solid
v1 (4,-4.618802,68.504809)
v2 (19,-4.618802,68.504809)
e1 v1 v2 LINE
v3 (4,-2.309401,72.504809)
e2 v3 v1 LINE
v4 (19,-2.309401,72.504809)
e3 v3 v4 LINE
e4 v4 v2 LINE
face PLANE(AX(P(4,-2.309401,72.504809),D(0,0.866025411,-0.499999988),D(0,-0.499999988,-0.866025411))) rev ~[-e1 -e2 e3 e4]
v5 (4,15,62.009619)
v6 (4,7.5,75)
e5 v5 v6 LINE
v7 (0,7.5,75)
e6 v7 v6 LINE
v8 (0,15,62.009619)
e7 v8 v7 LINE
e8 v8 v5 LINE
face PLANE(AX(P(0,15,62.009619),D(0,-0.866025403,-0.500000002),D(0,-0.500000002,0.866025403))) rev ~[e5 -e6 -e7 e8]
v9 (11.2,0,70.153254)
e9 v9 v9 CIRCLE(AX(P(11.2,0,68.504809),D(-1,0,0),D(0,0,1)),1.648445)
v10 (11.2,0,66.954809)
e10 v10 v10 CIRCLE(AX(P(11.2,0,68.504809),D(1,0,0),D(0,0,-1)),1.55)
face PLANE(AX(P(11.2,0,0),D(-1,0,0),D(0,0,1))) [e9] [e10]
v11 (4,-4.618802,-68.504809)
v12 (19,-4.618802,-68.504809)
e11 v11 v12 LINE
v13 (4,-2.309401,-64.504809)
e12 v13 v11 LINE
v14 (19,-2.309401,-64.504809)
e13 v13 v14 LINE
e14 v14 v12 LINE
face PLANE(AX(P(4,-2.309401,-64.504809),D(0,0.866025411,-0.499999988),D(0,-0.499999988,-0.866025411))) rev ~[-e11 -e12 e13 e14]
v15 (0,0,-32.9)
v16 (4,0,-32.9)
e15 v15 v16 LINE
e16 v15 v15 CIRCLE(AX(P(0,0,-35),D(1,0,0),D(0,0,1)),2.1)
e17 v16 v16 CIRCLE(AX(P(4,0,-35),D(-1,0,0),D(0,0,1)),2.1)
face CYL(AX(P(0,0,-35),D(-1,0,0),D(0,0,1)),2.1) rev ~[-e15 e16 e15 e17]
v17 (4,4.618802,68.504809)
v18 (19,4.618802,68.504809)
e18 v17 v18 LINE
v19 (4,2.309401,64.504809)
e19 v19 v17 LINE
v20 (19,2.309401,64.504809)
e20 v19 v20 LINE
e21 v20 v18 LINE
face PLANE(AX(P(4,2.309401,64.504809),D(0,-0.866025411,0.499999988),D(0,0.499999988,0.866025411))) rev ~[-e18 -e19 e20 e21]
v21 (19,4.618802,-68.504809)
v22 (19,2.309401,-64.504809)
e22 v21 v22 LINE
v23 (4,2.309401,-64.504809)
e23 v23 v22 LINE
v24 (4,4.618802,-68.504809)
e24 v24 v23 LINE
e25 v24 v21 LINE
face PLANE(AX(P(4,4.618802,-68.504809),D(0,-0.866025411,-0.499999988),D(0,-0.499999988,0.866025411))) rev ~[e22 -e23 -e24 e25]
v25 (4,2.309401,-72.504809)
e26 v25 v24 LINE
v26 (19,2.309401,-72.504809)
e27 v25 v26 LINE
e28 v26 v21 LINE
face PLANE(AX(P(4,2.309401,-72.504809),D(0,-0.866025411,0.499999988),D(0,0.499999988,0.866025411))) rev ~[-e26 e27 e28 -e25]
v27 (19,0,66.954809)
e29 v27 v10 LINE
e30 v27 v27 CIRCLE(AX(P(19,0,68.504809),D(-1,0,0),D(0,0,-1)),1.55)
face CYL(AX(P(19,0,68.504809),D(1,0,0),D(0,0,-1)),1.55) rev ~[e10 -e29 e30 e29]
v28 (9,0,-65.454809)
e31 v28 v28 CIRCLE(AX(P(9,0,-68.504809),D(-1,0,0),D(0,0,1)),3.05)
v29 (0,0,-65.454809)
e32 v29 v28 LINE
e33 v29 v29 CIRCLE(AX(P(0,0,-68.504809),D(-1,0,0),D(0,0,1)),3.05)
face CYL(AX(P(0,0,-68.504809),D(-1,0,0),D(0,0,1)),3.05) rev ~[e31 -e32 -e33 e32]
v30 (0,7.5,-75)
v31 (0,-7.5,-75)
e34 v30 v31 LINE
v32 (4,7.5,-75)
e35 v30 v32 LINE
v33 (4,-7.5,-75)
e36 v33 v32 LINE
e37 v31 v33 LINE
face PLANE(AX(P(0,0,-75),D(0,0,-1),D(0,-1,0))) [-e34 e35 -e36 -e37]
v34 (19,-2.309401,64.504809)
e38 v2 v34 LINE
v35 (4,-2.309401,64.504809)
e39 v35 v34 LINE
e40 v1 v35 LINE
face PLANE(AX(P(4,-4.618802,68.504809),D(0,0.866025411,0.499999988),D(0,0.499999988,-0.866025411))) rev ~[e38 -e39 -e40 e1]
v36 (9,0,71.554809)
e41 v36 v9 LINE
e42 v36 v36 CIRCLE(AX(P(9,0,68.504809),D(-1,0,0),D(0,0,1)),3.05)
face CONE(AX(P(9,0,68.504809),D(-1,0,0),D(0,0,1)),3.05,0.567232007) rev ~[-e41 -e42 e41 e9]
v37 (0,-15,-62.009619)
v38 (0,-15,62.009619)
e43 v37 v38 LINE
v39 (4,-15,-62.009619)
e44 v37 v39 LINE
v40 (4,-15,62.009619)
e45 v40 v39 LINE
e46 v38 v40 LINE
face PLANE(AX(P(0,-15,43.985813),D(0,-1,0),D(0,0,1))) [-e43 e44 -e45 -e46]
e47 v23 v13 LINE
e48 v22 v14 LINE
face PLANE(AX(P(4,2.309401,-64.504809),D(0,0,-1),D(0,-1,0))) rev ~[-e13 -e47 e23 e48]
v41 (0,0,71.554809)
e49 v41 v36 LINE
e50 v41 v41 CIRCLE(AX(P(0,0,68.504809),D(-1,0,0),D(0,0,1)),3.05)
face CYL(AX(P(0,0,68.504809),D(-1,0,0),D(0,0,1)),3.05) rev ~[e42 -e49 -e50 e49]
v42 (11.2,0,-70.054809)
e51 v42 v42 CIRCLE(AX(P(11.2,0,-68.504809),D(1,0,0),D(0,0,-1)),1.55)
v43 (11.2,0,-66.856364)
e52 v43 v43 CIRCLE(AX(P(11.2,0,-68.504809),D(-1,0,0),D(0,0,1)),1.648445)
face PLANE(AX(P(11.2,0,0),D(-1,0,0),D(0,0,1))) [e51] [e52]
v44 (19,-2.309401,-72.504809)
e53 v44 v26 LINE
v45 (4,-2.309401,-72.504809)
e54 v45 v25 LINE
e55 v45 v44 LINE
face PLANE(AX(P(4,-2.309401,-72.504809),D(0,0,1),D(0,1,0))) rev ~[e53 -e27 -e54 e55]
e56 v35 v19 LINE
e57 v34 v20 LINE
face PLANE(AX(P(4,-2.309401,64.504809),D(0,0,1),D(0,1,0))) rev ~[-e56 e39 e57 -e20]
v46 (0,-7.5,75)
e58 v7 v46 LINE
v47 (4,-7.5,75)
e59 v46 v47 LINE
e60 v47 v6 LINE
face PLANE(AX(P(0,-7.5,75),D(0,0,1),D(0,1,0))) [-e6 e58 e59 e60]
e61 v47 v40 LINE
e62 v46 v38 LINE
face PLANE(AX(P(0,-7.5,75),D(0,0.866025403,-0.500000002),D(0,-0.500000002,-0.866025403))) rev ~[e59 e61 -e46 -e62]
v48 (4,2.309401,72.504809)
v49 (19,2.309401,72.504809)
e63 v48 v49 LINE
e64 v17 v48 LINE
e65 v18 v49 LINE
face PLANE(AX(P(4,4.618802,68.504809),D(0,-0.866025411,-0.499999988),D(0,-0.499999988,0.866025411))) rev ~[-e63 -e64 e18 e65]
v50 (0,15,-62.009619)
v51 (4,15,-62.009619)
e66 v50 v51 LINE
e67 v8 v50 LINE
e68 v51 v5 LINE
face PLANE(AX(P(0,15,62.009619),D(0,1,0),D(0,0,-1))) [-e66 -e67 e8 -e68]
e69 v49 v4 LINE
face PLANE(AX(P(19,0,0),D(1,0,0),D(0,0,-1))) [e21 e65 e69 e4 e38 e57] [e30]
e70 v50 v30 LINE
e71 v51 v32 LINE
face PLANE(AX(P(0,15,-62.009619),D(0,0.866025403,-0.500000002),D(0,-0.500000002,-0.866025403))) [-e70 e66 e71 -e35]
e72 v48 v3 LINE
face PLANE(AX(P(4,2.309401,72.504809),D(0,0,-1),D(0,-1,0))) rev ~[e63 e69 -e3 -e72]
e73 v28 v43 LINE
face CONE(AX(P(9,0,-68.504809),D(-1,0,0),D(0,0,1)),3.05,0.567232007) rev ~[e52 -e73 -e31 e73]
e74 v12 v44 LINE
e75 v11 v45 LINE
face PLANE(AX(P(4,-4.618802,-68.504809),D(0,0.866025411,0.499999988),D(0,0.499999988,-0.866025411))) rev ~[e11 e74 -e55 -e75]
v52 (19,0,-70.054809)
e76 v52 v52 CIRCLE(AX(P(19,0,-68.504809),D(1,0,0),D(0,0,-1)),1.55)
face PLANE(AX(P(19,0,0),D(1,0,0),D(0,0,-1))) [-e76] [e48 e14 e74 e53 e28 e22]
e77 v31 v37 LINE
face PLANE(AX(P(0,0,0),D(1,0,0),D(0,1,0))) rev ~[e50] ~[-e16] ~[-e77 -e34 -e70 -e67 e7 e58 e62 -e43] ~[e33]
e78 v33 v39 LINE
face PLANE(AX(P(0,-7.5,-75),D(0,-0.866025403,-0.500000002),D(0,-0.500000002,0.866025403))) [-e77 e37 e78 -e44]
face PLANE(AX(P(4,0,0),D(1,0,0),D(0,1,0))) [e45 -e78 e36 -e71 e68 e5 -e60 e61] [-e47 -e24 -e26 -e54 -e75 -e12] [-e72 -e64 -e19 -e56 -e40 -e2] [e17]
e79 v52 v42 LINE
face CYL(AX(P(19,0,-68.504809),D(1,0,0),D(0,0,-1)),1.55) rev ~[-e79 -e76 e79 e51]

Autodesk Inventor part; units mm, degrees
ref_plane "YZ Plane" through (0, 0, 0) normal (1, 0, 0) x (0, 1, 0)
ref_plane "XZ Plane" through (0, 0, 0) normal (0, 1, 0) x (-1, 0, 0)
sketch "Sketch1" plane through (0, 0, 0) normal (1, 0, 0) x (0, 1, 0)
  line L0 (-15, 75) -> (15, 75)
  line L1 (15, 75) -> (15, -75)
  line L2 (15, -75) -> (-15, -75)
  line L3 (-15, -75) -> (-15, 75)
  line L4 (-15, 75) -> (15, -75) construction
  line L5 (15, 75) -> (-15, -75) construction
  line L6 (15, 64.89637) -> (15, 43.985813)
  line L7 (-15, 43.985813) -> (-15, 64.193072)
  line L8 (-21, 0) -> (21, 0)
  line L9 (0, -105) -> (0, 105)
  line L10 (-15, -62.009619) -> (-7.5, -49.019238)
  line L11 (-7.5, -49.019238) -> (7.5, -49.019238)
  line L12 (7.5, -49.019238) -> (15, -62.009619)
  line L13 (15, -62.009619) -> (7.5, -75)
  line L14 (7.5, -75) -> (-7.5, -75)
  line L15 (-7.5, -75) -> (-15, -62.009619)
  line L16 (15, 62.009619) -> (7.5, 75)
  line L17 (-7.5, 75) -> (-15, 62.009619)
  point P0 (0, 0)
  point P1 (0, -62.009619)
  point P2 (-7.5, -75)
  point P3 (7.5, -75)
  point P4 (15, -62.009619)
  point P5 (15, 62.009619)
  point P6 (7.5, 75)
  point P7 (-7.5, 75)
  point P8 (-15, 62.009619)
  dimension "d0" = 30
  dimension "d1" = 150
extrude "Extrusion1" add sketch "Sketch1" along normal blind 4 contours L0 L9 L8 L3 L17 | L0 L16 L1 L8 L9 | L9 L11 L10 L3 L8 | L8 L1 L12 L11 L9 | L11 L12 L13 L2 L9 | L9 L2 L15 L10 L11
sketch "Sketch2" plane through (4, 0, 0) normal (1, 0, 0) x (0, 0, -1)
  line L0 (62.009619, 15) -> (-62.009619, 15)
  line L1 (62.009619, 15) -> (-62.009619, 15)
  line L2 (-62.009619, -15) -> (62.009619, -15)
  line L3 (-105, 0) -> (105, 0)
  line L4 (0, -21) -> (0, 21)
  line L5 (-68.504809, 4.618802) -> (-64.504809, 2.309401)
  line L6 (-64.504809, 2.309401) -> (-64.504809, -2.309401)
  line L7 (-64.504809, -2.309401) -> (-68.504809, -4.618802)
  line L8 (-68.504809, -4.618802) -> (-72.504809, -2.309401)
  line L9 (-72.504809, -2.309401) -> (-72.504809, 2.309401)
  line L10 (-72.504809, 2.309401) -> (-68.504809, 4.618802)
  line L11 (68.504809, 4.618802) -> (64.504809, 2.309401)
  line L12 (64.504809, 2.309401) -> (64.504809, -2.309401)
  line L13 (64.504809, -2.309401) -> (68.504809, -4.618802)
  line L14 (68.504809, -4.618802) -> (72.504809, -2.309401)
  line L15 (72.504809, -2.309401) -> (72.504809, 2.309401)
  line L16 (72.504809, 2.309401) -> (68.504809, 4.618802)
  line L17 (-75, 7.5) -> (-75, -7.5)
  line L18 (-62.009619, -15) -> (62.009619, -15)
  line L19 (-62.009619, 15) -> (-62.009619, -15)
  line L20 (-75, 7.5) -> (-75, -7.5)
  line L21 (-75, 0) -> (-62.009619, 0)
  point P0 (0, 0)
  point P1 (68.504809, 0)
  point P2 (-68.504809, 0)
  dimension "d8" = 8
sketch "Sketch2 outline for Extrusion3" plane through (4, 0, 0) normal (1, 0, 0) x (0, 0, -1)
  line L0 (68.504809, -4.618802) -> (72.504809, -2.309401)
  line L1 (64.504809, -2.309401) -> (68.504809, -4.618802)
  line L2 (64.504809, 2.309401) -> (64.504809, -2.309401)
  line L3 (68.504809, 4.618802) -> (64.504809, 2.309401)
  line L4 (72.504809, 2.309401) -> (68.504809, 4.618802)
  line L5 (72.504809, -2.309401) -> (72.504809, 2.309401)
  line L6 (-64.504809, 2.309401) -> (-68.504809, 4.618802)
  line L7 (-64.504809, -2.309401) -> (-64.504809, 2.309401)
  line L8 (-68.504809, -4.618802) -> (-64.504809, -2.309401)
  line L9 (-72.504809, -2.309401) -> (-68.504809, -4.618802)
  line L10 (-72.504809, 2.309401) -> (-72.504809, -2.309401)
  line L11 (-68.504809, 4.618802) -> (-72.504809, 2.309401)
extrude "Extrusion3" add sketch "Sketch2 outline for Extrusion3" along normal blind 15
sketch "Sketch3" plane through (19, 0, 0) normal (1, 0, 0) x (0, 0, -1)
  line L0 (-64.504809, 2.309401) -> (-68.504809, 4.618802)
  line L1 (-68.504809, -4.618802) -> (-64.504809, -2.309401)
  line L2 (-64.504809, -2.309401) -> (-64.504809, 2.309401)
  line L3 (-64.504809, -2.309401) -> (-68.504809, -4.618802)
  circle A0 centre (-68.504809, 0) radius 1.55
  line L4 (0, -21) -> (0, 21)
  circle A1 centre (68.504809, 0) radius 1.55
  line L5 (-68.504809, 4.618802) -> (-68.504809, -4.618802)
  point P0 (0, 0)
  dimension "d12" = 3.1
extrude "Extrusion4" cut sketch "Sketch3" against normal through all contours L5 A0 | A0 L5 | A1
ref_plane "Work Plane1" through (9, 0, 0) normal (1, 0, 0) x (0, 0, -1)
sketch "Sketch4" plane through (9, 0, 0) normal (-1, 0, 0) x (0, 0, 1)
  circle A0 centre (-68.504809, 0) radius 1.55
  circle A1 centre (68.504809, 0) radius 1.55
  circle A2 centre (-68.504809, 0) radius 3.05
  circle A3 centre (68.504809, 0) radius 3.05
  point P0 (0, 0)
  dimension "d15" = 6.1
sketch "Sketch4 outline for Extrusion5" plane through (9, 0, 0) normal (-1, 0, 0) x (0, 0, 1)
  circle A0 centre (68.504809, 0) radius 3.05
  circle A1 centre (-68.504809, 0) radius 3.05
extrude "Extrusion5" cut sketch "Sketch4 outline for Extrusion5" against normal blind 2.2 draft -32.5
sketch "Sketch5" plane through (0, 0, 0) normal (-1, 0, 0) x (0, 0, 1)
  circle A0 centre (-68.504809, 0) radius 3.05
  circle A1 centre (68.504809, 0) radius 3.05
  point P0 (0, 0)
extrude "Extrusion6" cut sketch "Sketch5" against normal up to surface (9 mm away)
sketch "Sketch8" plane through (0, 0, 0) normal (-1, 0, 0) x (0, 0, 1)
  circle A0 centre (-35, 0) radius 2.1
  line L0 (-75, -7.5) -> (-75, 7.5) projected
  line L1 (0, -21) -> (0, 21) projected
  line L2 (75, 7.5) -> (75, -7.5) projected
  line L3 (-105, 0) -> (105, 0) projected
  point P0 (0, 0)
  dimension "d26" = 40
  dimension "d27" = 4.2
extrude "Extrusion7" cut sketch "Sketch8" against normal through all
equation "\"d0\" = BodyHeight"
equation "\"d1\" = BodyLength"
equation "\"d2\" = SideThickness"
equation "\"d8\" = M3ScrewInsertBrim"
equation "\"d9\" = WheeGuardlSlotWidth"
equation "\"d12\" = M3ScrewDia"
equation "\"d15\" = M3ScrewHeadDia"
equation "\"d16\" = M3ScrewHeadDepth"
equation "\"d17\" = M3ScrewHeadTaper"
equation "\"d26\" = DriveMotorOffset"
equation "\"d27\" = DriveMotorHoleDia"
equation "\"BodyHeight\" = 30"
equation "\"BodyLength\" = 150"
equation "\"SideThickness\" = 4"
equation "\"M3ScrewInsertBrim\" = 8"
equation "\"WheeGuardlSlotWidth\" = 15"
equation "\"M3ScrewDia\" = 3.1"
equation "\"M3ScrewHeadDia\" = 6.1"
equation "\"M3ScrewHeadDepth\" = 2.2"
equation "\"M3ScrewHeadTaper\" = -32.5deg"
equation "\"DriveMotorOffset\" = 40"
equation "\"DriveMotorHoleDia\" = 4.2"
properties part number "HexWheelGuard" material "H TPU"
